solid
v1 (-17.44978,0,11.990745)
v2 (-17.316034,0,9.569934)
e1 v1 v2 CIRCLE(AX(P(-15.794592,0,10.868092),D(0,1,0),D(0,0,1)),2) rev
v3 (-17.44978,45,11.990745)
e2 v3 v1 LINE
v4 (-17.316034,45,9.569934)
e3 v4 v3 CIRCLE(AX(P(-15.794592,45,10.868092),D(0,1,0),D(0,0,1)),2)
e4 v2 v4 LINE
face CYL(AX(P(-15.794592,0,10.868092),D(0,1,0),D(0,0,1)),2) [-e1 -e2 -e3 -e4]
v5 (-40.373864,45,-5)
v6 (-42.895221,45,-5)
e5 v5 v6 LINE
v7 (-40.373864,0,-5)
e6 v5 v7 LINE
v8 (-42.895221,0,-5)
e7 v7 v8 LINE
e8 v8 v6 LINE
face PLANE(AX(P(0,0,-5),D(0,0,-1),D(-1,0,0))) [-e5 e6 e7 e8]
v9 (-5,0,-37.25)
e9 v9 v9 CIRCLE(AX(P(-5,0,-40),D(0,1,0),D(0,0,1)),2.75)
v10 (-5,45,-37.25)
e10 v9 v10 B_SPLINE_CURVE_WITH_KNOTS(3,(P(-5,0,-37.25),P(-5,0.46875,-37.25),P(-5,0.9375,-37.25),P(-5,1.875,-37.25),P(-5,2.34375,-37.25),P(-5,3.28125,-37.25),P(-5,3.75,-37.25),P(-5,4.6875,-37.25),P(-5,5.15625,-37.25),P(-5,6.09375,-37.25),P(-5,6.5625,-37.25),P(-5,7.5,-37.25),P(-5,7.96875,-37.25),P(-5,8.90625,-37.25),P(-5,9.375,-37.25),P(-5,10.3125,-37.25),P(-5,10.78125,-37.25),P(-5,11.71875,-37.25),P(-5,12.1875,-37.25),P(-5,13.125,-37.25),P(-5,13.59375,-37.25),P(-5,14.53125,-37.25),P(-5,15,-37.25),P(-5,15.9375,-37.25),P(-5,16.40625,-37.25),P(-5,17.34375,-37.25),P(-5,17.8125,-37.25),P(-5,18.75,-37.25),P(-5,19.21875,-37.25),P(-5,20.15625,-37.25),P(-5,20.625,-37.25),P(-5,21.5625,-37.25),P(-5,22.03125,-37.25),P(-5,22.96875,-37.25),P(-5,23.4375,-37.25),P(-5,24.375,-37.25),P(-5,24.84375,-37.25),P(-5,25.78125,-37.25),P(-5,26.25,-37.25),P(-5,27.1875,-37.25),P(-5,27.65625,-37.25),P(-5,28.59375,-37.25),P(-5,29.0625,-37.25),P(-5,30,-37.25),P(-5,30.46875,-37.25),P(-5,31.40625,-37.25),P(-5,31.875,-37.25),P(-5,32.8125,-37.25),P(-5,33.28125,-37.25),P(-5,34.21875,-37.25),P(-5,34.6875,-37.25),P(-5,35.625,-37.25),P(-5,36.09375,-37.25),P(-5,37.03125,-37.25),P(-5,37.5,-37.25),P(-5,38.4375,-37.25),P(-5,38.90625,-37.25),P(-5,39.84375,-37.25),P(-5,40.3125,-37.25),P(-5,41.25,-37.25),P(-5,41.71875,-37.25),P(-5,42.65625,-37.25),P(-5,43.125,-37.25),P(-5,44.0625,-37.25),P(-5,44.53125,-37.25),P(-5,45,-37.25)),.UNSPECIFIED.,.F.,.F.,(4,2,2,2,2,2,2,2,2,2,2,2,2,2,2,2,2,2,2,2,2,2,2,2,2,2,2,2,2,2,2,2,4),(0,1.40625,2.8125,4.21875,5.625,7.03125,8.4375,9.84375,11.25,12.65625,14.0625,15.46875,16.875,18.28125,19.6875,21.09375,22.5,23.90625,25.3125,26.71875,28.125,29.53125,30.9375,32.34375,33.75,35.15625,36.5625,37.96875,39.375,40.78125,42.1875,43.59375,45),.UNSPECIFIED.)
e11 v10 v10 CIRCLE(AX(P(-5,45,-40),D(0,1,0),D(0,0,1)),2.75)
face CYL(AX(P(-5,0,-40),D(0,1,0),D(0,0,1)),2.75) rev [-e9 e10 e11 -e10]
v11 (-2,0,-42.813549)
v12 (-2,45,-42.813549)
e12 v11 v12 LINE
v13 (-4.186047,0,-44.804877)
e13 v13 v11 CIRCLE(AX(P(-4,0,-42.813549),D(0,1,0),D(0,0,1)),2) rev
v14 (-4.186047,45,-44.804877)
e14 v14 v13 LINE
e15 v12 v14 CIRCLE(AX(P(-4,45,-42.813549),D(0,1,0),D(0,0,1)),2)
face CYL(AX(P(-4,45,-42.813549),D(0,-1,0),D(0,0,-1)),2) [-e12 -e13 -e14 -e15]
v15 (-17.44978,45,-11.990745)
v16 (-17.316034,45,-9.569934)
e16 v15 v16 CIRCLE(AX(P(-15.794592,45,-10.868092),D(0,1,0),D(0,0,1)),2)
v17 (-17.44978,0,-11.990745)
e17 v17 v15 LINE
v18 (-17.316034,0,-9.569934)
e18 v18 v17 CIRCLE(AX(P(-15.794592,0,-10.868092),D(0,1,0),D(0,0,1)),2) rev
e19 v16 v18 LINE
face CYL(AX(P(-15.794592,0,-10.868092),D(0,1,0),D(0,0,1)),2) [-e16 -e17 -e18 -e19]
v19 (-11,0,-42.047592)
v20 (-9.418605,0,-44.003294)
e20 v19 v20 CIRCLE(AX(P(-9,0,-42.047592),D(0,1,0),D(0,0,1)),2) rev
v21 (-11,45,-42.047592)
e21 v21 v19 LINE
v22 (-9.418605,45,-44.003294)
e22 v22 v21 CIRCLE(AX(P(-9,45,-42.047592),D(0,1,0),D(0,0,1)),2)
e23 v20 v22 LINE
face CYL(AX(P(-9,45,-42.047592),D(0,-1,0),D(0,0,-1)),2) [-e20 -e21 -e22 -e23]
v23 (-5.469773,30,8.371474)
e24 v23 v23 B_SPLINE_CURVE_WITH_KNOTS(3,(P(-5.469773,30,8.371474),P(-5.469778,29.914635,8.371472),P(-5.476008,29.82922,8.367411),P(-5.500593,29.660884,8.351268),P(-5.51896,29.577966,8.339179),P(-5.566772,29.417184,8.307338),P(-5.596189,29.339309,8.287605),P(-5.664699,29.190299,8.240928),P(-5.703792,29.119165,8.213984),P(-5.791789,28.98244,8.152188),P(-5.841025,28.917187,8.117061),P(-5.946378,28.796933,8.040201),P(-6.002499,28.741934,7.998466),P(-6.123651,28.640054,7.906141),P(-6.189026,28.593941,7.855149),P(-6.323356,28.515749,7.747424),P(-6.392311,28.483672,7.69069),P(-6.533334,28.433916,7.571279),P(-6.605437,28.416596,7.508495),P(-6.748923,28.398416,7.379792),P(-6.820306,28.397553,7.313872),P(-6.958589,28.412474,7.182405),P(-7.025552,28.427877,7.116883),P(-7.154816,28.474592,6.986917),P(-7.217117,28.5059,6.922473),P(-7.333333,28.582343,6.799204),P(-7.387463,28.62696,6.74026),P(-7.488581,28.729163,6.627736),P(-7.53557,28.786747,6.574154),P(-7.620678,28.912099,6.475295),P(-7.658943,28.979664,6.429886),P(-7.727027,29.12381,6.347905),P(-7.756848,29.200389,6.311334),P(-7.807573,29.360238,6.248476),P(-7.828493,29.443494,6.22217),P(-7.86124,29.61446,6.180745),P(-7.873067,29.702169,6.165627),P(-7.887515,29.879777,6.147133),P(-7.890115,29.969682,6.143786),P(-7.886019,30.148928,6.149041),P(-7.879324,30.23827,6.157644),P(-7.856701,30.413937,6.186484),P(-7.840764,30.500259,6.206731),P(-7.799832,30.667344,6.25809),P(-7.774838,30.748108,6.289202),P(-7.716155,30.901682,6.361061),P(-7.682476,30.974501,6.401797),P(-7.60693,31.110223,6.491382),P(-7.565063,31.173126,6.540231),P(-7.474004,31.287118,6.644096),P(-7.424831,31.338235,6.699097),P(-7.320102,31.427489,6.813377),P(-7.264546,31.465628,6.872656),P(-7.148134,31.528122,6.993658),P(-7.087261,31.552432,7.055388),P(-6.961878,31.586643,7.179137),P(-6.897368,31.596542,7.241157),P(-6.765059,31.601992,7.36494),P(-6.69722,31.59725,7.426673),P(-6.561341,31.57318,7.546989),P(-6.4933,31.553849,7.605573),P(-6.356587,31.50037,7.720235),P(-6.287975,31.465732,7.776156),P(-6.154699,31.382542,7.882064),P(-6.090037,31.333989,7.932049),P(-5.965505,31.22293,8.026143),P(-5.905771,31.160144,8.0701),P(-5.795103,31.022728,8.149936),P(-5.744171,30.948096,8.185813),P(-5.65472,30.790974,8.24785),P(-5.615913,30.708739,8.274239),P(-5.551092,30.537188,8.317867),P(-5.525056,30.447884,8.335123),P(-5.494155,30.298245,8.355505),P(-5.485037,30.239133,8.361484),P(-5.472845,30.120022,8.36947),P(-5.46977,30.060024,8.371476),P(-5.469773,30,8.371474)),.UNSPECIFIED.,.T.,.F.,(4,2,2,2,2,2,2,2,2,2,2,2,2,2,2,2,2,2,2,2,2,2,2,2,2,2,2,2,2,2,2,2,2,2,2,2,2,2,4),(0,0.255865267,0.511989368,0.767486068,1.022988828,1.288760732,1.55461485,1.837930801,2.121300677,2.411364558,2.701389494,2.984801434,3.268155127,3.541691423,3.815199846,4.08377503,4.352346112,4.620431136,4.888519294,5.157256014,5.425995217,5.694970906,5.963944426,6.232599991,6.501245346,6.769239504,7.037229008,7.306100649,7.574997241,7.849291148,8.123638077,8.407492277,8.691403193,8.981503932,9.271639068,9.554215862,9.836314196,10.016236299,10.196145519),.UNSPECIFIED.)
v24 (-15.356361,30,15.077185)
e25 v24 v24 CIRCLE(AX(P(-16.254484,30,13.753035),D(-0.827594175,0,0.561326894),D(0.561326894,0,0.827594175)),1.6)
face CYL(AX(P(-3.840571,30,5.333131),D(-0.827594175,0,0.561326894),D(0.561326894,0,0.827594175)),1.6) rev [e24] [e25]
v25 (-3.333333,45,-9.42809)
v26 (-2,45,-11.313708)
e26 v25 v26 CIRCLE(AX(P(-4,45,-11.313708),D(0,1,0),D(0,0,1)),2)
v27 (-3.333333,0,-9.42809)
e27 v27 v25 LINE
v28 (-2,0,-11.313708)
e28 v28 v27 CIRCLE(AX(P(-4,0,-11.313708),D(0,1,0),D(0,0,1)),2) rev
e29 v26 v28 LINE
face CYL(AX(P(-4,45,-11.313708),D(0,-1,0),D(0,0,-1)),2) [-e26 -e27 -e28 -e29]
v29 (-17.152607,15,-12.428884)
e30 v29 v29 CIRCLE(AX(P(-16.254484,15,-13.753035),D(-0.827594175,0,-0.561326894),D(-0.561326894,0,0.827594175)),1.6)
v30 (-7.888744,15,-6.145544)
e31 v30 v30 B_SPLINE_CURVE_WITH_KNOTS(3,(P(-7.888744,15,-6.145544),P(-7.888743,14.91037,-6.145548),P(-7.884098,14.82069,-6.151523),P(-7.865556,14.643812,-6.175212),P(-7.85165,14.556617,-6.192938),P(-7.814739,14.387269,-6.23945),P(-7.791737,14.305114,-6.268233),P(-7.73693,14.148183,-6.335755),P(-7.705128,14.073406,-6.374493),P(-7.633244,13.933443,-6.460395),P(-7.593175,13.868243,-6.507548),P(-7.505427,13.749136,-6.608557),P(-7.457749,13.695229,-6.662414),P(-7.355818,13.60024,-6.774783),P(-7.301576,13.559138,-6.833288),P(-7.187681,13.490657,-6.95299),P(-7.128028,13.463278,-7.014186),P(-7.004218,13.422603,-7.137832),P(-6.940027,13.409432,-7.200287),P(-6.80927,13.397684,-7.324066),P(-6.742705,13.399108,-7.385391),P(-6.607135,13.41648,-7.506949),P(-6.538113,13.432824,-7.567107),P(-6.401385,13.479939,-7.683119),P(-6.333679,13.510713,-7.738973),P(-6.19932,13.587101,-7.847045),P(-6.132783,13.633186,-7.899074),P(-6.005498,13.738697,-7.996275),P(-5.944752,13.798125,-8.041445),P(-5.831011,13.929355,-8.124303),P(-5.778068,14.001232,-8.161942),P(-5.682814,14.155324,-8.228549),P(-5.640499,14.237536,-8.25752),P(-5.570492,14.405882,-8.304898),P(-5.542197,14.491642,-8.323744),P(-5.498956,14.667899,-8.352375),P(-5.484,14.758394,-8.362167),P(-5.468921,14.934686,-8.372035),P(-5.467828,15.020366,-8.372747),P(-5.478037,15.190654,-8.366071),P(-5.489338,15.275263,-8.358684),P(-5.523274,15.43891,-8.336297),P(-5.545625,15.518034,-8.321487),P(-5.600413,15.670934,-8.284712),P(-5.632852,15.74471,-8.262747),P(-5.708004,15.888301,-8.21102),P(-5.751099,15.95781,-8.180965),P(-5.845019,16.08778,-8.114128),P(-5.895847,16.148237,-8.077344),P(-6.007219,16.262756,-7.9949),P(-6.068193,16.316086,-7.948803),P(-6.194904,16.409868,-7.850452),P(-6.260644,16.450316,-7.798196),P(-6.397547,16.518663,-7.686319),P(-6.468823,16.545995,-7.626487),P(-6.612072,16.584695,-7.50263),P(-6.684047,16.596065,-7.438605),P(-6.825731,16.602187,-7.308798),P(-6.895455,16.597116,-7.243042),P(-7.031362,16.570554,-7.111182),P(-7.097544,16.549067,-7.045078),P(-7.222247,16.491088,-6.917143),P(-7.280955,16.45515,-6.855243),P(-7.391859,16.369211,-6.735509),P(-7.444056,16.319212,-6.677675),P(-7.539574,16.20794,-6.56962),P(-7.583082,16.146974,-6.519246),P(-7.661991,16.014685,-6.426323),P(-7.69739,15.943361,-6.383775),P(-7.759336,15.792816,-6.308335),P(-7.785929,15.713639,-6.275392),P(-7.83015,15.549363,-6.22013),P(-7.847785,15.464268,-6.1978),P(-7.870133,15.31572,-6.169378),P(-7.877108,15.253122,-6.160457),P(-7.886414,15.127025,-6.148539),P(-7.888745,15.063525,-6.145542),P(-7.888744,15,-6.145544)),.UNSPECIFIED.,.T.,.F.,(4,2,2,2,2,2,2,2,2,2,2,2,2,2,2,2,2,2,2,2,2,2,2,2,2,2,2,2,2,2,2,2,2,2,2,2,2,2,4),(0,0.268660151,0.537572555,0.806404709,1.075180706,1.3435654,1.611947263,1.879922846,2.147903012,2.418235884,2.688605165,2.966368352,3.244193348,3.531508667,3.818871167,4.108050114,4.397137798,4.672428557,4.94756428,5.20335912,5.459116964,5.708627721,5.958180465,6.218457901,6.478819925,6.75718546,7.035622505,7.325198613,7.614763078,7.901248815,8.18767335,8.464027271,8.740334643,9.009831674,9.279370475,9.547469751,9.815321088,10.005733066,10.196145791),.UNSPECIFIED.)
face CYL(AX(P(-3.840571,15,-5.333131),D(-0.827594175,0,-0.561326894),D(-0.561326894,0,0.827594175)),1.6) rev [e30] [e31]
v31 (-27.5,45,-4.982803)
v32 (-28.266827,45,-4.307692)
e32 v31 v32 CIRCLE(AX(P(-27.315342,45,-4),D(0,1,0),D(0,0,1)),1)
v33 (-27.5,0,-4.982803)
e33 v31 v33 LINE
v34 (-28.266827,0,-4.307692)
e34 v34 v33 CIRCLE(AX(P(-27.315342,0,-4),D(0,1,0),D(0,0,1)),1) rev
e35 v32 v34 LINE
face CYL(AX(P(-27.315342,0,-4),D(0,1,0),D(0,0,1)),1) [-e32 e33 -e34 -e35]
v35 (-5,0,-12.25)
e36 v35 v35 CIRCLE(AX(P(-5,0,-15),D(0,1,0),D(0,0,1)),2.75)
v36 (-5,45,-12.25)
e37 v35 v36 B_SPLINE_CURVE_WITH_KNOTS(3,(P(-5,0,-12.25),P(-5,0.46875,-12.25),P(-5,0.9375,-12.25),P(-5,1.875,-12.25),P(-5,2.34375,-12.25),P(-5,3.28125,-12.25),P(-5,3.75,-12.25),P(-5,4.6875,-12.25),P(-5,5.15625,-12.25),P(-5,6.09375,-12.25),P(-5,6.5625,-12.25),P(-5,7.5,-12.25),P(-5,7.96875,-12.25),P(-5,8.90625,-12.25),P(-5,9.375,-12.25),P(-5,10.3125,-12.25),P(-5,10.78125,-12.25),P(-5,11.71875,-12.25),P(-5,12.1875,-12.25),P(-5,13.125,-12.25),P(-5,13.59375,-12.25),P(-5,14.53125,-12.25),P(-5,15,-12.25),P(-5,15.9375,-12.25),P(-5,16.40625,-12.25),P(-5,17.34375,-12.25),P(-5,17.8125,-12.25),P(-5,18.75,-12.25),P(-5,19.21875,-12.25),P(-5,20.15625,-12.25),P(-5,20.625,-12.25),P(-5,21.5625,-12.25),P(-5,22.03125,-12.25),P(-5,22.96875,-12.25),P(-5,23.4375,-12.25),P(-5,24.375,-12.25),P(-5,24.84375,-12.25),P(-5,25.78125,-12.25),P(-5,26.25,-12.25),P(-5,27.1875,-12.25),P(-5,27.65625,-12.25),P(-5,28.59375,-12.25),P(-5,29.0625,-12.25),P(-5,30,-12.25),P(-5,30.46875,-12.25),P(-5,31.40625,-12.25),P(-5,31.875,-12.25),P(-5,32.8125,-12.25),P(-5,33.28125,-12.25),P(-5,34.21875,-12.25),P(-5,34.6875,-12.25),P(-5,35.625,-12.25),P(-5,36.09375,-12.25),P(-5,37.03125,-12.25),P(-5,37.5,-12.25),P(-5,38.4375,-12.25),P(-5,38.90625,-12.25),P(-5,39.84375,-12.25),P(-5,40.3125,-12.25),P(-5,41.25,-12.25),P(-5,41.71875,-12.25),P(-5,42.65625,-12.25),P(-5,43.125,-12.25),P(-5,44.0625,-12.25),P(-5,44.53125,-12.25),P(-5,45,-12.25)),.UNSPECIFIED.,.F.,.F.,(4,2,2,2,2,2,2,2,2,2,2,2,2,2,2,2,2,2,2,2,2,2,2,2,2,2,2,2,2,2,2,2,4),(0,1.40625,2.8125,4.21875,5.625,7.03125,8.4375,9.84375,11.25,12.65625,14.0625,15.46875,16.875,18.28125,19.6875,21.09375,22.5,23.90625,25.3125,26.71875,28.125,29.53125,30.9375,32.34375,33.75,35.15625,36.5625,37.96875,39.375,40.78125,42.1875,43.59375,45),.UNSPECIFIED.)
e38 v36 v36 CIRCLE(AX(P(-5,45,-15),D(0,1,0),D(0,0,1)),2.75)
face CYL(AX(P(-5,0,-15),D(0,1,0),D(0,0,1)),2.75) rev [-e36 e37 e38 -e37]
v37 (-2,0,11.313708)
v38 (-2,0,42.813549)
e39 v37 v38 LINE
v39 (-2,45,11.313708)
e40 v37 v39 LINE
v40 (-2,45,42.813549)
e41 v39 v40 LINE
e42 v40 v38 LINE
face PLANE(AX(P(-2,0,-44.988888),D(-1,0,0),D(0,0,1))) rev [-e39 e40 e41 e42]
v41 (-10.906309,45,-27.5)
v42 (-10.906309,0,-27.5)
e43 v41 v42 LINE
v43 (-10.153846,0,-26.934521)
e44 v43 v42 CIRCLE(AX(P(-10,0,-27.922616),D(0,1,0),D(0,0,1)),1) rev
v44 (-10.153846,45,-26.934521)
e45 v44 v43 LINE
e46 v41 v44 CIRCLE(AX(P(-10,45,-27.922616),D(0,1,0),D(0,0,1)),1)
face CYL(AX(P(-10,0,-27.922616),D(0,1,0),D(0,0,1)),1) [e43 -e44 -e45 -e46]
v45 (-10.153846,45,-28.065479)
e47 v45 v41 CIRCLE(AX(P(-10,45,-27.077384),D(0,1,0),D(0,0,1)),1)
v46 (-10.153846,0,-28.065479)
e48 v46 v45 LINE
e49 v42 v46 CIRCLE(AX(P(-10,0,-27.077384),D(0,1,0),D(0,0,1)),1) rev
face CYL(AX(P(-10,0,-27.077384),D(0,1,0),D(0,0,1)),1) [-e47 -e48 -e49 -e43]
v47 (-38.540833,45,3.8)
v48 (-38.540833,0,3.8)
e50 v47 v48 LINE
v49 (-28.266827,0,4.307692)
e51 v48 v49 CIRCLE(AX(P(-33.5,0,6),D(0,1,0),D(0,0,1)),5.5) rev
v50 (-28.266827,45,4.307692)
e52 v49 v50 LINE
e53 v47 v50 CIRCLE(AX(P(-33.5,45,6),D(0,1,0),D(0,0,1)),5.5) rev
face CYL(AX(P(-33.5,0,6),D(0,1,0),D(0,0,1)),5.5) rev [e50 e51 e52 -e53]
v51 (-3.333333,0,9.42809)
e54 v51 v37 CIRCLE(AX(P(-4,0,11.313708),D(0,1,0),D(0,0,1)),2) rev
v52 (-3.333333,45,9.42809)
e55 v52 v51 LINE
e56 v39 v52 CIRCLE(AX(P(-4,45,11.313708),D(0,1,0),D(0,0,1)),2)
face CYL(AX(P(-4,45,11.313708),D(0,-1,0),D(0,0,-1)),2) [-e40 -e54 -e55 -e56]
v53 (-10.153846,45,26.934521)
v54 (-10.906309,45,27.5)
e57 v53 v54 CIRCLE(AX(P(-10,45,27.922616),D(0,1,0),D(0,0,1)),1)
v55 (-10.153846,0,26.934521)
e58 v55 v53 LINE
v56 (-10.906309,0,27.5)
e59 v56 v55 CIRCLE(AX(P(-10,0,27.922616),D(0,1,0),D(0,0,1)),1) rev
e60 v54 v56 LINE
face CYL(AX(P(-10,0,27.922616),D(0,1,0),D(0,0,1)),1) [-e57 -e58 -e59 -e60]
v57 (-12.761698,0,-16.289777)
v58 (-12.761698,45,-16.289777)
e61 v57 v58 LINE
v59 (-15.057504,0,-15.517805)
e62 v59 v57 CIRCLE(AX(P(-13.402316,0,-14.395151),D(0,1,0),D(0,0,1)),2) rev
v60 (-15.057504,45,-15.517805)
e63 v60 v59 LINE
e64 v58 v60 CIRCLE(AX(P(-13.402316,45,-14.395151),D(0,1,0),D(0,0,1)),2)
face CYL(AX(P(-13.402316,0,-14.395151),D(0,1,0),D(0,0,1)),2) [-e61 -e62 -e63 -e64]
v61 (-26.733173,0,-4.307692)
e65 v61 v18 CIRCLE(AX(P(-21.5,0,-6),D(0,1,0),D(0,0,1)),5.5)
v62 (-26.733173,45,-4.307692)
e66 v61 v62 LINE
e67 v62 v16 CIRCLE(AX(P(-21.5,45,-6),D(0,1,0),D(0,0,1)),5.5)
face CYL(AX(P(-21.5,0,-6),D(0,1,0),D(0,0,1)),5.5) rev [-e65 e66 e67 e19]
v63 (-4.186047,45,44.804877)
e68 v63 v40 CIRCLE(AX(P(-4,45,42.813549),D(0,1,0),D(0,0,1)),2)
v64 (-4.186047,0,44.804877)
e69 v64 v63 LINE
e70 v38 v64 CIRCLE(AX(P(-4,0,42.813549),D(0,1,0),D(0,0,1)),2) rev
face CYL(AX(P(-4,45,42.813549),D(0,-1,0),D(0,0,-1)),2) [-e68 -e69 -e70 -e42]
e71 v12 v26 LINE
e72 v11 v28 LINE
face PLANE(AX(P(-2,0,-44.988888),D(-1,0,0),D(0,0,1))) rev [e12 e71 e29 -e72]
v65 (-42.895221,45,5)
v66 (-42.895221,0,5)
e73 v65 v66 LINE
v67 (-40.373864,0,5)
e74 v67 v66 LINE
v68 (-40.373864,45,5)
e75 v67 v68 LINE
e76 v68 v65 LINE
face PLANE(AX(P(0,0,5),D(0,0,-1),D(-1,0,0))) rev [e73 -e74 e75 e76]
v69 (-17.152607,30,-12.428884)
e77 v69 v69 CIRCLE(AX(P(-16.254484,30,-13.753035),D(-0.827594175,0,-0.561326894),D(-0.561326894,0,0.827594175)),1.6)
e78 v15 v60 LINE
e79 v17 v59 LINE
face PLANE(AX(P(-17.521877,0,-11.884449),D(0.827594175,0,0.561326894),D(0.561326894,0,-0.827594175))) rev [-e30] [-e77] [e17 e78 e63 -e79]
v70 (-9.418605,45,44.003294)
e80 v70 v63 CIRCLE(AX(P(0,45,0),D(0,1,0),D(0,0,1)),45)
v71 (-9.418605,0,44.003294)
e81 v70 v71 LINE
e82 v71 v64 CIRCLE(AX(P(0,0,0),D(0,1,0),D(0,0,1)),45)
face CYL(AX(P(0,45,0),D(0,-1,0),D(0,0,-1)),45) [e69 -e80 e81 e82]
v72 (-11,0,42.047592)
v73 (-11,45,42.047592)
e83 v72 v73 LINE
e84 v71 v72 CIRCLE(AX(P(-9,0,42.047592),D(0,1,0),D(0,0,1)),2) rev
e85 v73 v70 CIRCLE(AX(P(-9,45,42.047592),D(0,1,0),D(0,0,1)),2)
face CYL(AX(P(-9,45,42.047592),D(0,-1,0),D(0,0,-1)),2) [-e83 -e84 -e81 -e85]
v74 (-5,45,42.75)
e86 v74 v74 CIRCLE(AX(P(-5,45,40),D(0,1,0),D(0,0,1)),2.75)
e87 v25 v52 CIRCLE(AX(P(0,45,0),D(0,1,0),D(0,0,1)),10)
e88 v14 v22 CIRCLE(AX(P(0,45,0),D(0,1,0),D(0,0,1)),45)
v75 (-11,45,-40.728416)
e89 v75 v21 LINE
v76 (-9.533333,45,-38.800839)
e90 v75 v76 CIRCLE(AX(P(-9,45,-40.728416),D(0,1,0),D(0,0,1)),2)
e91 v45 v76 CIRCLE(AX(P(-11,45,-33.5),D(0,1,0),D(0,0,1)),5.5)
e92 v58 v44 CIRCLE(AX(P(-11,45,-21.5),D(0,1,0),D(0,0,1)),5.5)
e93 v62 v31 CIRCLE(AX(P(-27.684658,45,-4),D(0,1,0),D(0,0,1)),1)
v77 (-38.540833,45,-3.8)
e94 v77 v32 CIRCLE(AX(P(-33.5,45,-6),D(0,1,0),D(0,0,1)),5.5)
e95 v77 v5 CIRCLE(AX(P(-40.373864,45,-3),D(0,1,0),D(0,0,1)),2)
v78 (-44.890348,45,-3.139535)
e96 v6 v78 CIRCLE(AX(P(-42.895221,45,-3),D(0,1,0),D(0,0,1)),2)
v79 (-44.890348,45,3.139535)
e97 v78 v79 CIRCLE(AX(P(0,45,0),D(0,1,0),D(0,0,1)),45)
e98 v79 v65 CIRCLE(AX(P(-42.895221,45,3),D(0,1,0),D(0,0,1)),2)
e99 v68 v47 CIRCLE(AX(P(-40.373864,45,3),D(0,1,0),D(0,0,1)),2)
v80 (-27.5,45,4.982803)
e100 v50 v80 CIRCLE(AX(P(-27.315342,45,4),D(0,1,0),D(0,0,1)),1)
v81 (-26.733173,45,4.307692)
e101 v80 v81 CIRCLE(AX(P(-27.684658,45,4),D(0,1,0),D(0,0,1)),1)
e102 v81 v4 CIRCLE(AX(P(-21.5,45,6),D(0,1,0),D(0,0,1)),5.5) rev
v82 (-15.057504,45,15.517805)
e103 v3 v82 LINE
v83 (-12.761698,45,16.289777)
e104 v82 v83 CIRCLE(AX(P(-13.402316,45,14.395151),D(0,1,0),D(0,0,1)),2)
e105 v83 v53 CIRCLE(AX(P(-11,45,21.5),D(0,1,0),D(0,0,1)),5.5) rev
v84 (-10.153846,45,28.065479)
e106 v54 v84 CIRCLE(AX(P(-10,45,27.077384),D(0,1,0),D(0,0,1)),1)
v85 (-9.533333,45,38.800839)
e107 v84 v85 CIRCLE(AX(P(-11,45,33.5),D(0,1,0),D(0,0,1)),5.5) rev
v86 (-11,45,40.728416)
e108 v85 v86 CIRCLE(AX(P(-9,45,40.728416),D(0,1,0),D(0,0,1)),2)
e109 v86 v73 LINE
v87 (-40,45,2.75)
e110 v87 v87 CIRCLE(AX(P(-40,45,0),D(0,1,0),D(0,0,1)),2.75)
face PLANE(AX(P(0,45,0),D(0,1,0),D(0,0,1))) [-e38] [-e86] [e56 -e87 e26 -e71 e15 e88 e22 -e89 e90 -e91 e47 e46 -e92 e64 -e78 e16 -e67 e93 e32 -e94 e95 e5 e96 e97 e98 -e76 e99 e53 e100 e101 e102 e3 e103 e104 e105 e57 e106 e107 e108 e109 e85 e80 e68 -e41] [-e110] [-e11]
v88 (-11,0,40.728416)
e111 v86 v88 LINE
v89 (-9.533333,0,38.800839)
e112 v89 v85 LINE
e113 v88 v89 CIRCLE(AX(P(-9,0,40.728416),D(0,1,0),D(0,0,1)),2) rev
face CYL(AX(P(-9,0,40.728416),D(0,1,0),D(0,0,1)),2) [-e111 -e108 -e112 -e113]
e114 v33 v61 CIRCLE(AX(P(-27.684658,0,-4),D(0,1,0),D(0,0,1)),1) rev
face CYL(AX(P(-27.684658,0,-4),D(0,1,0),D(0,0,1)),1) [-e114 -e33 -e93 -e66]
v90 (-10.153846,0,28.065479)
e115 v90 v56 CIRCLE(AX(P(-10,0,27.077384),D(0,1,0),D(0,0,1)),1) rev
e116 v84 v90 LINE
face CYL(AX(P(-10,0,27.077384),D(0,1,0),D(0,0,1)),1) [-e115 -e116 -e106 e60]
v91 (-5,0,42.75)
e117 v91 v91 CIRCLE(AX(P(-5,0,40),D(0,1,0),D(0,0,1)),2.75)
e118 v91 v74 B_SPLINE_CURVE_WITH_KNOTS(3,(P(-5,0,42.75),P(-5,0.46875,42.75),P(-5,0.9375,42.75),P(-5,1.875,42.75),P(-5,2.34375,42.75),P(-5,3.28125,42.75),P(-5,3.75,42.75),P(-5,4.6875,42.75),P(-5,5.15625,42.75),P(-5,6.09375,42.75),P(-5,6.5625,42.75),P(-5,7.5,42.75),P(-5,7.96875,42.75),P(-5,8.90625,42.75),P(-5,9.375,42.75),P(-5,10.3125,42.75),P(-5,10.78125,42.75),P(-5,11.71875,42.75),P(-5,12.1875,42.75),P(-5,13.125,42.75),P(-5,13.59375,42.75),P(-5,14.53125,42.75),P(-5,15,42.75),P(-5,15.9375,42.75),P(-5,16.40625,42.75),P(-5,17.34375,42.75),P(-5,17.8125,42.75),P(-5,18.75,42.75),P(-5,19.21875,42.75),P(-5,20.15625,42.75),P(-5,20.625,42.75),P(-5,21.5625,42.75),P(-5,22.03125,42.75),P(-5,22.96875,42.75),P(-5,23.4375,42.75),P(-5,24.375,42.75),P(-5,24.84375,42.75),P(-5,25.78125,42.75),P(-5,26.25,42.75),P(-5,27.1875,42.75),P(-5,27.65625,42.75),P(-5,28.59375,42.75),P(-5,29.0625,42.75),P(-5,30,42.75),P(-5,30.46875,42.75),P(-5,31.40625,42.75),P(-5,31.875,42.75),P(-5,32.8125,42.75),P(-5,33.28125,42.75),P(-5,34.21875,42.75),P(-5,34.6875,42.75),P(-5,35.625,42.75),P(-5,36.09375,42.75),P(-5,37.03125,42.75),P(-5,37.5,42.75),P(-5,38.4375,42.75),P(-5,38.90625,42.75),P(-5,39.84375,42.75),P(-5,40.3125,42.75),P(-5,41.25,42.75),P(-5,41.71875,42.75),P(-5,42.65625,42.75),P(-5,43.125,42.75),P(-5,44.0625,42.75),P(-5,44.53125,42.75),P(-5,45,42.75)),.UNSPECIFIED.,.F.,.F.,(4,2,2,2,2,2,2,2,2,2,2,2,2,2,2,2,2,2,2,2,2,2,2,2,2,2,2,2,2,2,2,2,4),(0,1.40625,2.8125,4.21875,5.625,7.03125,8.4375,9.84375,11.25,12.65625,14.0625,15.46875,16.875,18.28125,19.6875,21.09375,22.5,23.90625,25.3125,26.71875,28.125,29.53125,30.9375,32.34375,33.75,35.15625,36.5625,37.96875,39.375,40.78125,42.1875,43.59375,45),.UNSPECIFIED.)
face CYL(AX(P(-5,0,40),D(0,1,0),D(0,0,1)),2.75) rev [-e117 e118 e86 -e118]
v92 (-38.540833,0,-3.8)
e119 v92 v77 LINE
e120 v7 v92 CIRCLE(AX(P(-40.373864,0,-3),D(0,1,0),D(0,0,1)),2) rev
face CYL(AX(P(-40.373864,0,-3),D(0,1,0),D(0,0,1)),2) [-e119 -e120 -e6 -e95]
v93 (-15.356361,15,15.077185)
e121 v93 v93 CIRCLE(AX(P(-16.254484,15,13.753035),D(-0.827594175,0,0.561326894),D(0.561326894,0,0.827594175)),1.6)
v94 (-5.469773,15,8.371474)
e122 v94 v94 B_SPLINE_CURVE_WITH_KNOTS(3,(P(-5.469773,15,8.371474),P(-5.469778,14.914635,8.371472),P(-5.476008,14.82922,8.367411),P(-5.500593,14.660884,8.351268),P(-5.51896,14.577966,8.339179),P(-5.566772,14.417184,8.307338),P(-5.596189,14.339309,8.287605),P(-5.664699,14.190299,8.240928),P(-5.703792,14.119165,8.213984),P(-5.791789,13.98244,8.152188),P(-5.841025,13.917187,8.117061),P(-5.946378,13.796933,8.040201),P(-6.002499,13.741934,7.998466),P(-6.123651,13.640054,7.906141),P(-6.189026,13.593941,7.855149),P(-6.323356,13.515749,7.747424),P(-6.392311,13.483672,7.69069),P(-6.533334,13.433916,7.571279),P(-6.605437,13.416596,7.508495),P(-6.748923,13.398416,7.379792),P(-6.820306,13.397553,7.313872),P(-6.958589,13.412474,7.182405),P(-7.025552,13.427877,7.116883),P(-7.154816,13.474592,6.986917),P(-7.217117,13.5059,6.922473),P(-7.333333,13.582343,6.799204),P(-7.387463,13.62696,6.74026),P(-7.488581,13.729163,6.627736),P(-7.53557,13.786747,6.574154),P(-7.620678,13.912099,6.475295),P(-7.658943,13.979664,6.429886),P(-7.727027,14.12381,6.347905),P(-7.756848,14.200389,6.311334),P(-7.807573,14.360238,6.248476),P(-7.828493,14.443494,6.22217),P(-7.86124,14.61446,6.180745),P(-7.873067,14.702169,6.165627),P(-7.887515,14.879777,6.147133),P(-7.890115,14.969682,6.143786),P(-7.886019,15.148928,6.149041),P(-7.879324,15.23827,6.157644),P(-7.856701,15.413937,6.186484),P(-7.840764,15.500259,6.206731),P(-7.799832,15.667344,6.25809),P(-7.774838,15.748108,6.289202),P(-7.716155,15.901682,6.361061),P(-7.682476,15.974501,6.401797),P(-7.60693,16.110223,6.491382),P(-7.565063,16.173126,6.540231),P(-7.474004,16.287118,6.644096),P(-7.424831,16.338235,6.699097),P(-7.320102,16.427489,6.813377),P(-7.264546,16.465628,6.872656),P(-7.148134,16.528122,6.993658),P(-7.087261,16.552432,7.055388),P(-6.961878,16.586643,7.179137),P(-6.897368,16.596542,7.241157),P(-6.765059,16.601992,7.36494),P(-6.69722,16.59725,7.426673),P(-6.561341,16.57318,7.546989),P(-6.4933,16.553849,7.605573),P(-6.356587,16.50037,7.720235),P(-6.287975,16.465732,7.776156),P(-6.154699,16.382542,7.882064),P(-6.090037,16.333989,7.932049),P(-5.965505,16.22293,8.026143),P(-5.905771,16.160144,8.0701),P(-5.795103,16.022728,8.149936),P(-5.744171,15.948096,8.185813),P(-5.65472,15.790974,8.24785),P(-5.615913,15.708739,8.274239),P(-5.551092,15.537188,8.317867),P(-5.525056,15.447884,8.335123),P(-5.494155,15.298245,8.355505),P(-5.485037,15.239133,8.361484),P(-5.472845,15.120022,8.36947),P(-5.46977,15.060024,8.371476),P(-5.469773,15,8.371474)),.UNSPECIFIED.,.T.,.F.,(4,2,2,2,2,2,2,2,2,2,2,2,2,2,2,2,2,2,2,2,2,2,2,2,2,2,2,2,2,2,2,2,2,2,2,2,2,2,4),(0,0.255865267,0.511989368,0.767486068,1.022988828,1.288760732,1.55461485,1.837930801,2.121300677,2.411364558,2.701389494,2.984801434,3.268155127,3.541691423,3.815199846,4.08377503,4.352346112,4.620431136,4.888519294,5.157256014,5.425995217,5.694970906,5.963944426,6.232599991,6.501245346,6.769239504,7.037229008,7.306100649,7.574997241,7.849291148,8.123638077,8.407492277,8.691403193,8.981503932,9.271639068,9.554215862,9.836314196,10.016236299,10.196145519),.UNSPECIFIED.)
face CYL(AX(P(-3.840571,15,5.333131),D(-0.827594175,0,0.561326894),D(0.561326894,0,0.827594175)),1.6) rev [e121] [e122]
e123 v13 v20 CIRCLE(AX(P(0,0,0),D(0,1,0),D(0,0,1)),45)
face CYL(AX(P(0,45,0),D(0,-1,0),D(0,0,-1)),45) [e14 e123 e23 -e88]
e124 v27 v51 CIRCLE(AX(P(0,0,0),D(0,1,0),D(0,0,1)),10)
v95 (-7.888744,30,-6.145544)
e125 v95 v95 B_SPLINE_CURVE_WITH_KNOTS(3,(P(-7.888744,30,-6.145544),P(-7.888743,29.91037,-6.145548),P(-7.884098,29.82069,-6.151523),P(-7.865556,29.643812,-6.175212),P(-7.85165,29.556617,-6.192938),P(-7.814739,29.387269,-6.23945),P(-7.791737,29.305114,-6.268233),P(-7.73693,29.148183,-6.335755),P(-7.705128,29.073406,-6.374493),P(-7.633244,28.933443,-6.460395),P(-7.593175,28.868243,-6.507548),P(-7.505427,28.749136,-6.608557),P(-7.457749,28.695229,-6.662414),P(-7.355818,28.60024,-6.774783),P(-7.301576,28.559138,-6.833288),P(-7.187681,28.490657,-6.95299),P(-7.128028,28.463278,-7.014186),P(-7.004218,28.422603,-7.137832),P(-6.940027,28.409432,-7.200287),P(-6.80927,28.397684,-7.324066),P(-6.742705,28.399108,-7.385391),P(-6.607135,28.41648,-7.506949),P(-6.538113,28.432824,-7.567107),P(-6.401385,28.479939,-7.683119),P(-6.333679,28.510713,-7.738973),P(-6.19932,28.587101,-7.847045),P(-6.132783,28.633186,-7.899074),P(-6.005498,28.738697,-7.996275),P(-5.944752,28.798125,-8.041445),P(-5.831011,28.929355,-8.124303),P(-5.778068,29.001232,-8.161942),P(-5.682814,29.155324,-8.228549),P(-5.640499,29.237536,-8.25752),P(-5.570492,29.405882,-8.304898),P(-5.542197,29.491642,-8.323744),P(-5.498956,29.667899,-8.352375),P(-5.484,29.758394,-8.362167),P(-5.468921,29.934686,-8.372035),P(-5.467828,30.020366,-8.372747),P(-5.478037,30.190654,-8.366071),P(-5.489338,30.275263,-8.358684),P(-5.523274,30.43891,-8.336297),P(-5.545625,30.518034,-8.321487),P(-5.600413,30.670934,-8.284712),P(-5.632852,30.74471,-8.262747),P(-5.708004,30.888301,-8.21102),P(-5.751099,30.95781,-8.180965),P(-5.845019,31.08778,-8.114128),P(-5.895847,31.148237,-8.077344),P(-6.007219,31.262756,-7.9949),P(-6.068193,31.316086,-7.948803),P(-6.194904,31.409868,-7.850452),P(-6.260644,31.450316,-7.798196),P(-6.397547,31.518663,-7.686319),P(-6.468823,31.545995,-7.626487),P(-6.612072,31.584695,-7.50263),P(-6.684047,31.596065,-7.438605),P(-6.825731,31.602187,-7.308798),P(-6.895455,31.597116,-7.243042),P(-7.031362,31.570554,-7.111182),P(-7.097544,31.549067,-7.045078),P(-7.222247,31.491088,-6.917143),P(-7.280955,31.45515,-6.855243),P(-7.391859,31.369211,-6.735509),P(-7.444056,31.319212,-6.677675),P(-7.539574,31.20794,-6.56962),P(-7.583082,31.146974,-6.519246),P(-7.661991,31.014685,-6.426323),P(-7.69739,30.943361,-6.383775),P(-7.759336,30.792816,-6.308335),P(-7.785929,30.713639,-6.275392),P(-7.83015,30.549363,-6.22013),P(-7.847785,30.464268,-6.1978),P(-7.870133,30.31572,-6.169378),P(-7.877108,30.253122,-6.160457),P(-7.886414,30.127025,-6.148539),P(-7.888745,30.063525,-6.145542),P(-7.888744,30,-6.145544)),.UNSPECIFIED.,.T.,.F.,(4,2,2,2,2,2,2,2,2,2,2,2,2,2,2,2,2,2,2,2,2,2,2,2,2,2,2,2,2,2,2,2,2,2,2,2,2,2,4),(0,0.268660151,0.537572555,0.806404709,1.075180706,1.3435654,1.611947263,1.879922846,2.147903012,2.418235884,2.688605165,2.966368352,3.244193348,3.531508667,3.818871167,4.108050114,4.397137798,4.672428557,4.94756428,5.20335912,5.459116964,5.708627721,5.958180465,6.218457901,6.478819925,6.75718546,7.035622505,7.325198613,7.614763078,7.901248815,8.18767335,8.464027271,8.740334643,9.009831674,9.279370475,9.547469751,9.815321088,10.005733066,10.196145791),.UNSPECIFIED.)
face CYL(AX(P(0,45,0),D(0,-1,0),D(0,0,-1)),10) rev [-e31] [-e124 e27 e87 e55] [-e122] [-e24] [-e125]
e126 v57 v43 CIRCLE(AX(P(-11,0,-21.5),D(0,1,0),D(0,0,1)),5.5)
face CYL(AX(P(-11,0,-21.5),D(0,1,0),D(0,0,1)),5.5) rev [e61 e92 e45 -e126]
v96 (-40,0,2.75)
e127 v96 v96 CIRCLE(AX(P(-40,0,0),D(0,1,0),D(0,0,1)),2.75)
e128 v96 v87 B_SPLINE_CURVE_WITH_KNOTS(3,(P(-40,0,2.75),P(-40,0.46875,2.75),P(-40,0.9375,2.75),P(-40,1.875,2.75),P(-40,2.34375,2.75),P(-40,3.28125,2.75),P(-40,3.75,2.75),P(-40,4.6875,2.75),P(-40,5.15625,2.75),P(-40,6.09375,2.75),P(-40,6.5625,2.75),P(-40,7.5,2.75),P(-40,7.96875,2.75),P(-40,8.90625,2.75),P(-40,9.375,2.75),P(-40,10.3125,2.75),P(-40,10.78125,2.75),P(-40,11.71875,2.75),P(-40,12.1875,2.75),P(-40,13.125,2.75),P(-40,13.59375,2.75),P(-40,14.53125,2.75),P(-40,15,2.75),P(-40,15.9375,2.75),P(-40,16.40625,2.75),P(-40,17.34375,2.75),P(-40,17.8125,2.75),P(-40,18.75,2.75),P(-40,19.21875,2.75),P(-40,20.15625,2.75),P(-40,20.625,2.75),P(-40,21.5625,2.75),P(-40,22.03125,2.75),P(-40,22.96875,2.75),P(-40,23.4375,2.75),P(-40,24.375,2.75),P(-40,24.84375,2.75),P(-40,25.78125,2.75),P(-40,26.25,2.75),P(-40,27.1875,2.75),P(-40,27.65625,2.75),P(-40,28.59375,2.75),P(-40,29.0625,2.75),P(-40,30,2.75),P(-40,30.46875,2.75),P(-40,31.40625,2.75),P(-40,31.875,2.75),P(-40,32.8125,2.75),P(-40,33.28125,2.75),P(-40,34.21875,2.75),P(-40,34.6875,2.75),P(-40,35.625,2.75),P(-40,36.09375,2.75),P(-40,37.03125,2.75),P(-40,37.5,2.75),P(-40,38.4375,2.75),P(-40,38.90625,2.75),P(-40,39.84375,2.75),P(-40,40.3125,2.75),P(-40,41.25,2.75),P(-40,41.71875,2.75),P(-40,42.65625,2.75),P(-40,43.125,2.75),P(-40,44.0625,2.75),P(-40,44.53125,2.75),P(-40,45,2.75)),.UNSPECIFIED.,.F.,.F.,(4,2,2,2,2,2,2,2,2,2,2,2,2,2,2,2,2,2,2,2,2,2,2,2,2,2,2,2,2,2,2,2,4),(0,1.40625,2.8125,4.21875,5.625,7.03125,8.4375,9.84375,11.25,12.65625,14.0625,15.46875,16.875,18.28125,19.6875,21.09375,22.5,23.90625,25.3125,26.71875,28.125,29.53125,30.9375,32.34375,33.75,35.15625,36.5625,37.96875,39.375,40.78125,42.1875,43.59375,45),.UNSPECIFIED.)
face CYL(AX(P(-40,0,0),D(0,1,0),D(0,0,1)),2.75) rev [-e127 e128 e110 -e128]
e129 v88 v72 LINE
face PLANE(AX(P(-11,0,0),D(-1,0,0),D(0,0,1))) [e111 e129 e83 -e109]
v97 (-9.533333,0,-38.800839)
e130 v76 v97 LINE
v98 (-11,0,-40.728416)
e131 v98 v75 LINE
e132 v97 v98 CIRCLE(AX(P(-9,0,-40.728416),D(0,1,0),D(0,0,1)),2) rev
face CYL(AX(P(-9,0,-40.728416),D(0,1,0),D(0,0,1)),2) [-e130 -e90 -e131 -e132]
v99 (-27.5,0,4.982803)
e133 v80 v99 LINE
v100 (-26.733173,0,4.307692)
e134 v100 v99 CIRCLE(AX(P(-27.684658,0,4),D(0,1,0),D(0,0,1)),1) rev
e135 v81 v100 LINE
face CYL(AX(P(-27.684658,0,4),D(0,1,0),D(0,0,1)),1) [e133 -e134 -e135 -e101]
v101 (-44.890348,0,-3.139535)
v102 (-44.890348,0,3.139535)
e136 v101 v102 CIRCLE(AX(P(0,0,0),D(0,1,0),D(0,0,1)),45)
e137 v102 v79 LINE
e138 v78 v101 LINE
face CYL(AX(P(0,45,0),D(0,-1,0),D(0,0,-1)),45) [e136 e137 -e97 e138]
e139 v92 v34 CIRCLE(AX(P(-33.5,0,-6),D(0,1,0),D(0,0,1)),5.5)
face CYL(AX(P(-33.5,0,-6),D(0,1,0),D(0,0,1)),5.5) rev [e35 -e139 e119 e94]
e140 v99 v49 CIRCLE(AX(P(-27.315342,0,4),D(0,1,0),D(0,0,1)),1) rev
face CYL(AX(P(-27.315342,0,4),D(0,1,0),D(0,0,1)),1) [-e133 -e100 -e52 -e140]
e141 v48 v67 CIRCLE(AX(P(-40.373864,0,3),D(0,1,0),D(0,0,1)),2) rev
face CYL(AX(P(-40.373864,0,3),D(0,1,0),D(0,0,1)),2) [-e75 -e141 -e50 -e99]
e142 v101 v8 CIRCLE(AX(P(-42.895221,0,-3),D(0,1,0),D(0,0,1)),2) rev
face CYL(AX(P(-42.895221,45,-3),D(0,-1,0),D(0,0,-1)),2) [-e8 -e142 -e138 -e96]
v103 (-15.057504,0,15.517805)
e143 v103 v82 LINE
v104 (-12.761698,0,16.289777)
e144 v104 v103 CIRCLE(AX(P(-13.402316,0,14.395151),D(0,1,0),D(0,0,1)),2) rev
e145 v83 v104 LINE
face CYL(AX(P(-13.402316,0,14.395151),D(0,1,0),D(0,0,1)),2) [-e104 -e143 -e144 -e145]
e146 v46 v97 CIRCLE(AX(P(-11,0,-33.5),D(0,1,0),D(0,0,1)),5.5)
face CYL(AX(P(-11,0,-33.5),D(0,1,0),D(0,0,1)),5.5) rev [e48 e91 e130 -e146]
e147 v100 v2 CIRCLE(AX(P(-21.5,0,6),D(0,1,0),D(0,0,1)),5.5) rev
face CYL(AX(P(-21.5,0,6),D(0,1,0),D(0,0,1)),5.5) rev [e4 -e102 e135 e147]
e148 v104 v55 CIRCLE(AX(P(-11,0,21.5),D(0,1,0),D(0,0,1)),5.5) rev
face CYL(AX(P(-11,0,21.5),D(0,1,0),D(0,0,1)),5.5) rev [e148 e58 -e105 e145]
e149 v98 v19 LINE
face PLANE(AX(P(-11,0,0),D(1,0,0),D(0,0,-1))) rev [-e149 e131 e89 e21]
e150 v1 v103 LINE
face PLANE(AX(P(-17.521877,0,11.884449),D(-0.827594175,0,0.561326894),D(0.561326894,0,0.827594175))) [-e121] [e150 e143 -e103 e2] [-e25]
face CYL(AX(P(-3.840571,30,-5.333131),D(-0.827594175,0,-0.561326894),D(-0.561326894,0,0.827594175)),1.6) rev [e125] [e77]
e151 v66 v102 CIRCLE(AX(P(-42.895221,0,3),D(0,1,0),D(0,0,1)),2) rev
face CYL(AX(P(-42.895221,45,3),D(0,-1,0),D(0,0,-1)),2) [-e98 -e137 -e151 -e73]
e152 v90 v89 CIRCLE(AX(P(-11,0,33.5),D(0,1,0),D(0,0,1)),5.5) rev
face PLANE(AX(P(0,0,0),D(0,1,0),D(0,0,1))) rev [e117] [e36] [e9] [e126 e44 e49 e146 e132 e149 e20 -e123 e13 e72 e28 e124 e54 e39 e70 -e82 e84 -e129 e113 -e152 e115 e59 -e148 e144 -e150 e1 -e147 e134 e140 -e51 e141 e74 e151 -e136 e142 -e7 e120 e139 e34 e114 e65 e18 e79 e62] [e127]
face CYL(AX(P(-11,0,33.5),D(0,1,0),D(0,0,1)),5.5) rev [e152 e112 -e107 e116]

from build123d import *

# Parameters (mm, degrees)
BOSS_EXTRUDE1_DEPTH = 45
SKETCH2_R           = 2.75
CUT_EXTRUDE1_DEPTH  = 45
SKETCH3_R           = 5.5
CUT_EXTRUDE2_DEPTH  = 45
CUT_EXTRUDE3_DEPTH  = 45
SKETCH5_R           = 1.6
CUT_EXTRUDE5_DEPTH  = 15
SKETCH6_R           = 1.6
CUT_EXTRUDE6_DEPTH  = 15
FILLET1_R           = 2
FILLET2_R           = 1
FILLET3_R           = 2
FILLET4_R           = 1
SKETCH7_W           = 1
SKETCH7_H           = 92.409175645
CUT_EXTRUDE7_DEPTH  = 45
FILLET8_R           = 2


with BuildPart() as part:
    # Sketch1 → Boss-Extrude1 (new body)
    with BuildSketch(Plane(origin=(0, 0, 0), x_dir=(1, 0, 0), z_dir=(0, 1, 0))):
        with BuildLine():
            Line((-1, 9.949874371), (-1, 44.988887517))
            ThreePointArc((-1, 44.988887517), (-45, 0), (-1, -44.988887517))
            Line((-1, -44.988887517), (-1, -9.949874371))
            ThreePointArc((-1, -9.949874371), (-10, 0), (-1, 9.949874371))
        make_face()
    extrude(amount=BOSS_EXTRUDE1_DEPTH)

    # Sketch2 → Cut-Extrude1 (cut)
    with BuildSketch(Plane(origin=(0, 45, 0), x_dir=(1, 0, 0), z_dir=(0, 1, 0))):
        with Locations(Location((-40, 0, 0), (0, 0, 270))):
            Circle(SKETCH2_R)
        with Locations(Location((-5, 15, 0), (0, 0, 270))):
            Circle(SKETCH2_R)
        with Locations(Location((-5, 40, 0), (0, 0, 270))):
            Circle(SKETCH2_R)
        with Locations(Location((-5, -40, 0), (0, 0, 270))):
            Circle(SKETCH2_R)
    extrude(amount=-CUT_EXTRUDE1_DEPTH, mode=Mode.SUBTRACT)

    # Sketch3 → Cut-Extrude2 (cut)
    with BuildSketch(Plane(origin=(0, 45, 0), x_dir=(1, 0, 0), z_dir=(0, 1, 0))):
        with Locations(Location((-33.5, 6, 0), (0, 0, 270))):
            Circle(SKETCH3_R)
        with Locations(Location((-21.5, 6, 0), (0, 0, 270))):
            Circle(SKETCH3_R)
        with Locations(Location((-11, 21.5, 0), (0, 0, 270))):
            Circle(SKETCH3_R)
        with Locations(Location((-11, 33.5, 0), (0, 0, 270))):
            Circle(SKETCH3_R)
        with Locations(Location((-33.5, -6, 0), (0, 0, 270))):
            Circle(SKETCH3_R)
        with Locations(Location((-21.5, -6, 0), (0, 0, 270))):
            Circle(SKETCH3_R)
        with Locations(Location((-11, -33.5, 0), (0, 0, 270))):
            Circle(SKETCH3_R)
        with Locations(Location((-11, -21.5, 0), (0, 0, 270))):
            Circle(SKETCH3_R)
    extrude(amount=-CUT_EXTRUDE2_DEPTH, mode=Mode.SUBTRACT)

    # Sketch4 → Cut-Extrude3 (cut)
    with BuildSketch(Plane(origin=(0, 45, 0), x_dir=(1, 0, 0), z_dir=(0, 1, 0))):
        with BuildLine():
            ThreePointArc((-11, 43.634848459), (-33.902512538, 29.590870951), (-44.72135955, 5))
            Line((-44.72135955, 5), (-38.908326913, 5))
            ThreePointArc((-38.908326913, 5), (-34.002096593, 11.477033779), (-28, 6))
            ThreePointArc((-28, 6), (-28.022966221, 5.497903407), (-28.091673087, 5))
            Line((-28.091673087, 5), (-27.5, 5))
            Line((-27.5, 5), (-26.908326913, 5))
            ThreePointArc((-26.908326913, 5), (-24.51323898, 10.601129302), (-18.421669276, 10.557837201))
            Line((-18.421669276, 10.557837201), (-14.087297918, 16.948232039))
            ThreePointArc((-14.087297918, 16.948232039), (-16.257600393, 23.11481829), (-11, 27))
            Line((-11, 27), (-11, 28))
            ThreePointArc((-11, 28), (-16.5, 33.5), (-11, 39))
            Line((-11, 39), (-11, 43.634848459))
        make_face()
        with BuildLine():
            Line((-38.908326913, -5), (-44.72135955, -5))
            ThreePointArc((-44.72135955, -5), (-33.902512538, -29.590870951), (-11, -43.634848459))
            Line((-11, -43.634848459), (-11, -39))
            ThreePointArc((-11, -39), (-16.5, -33.5), (-11, -28))
            Line((-11, -28), (-11, -27))
            ThreePointArc((-11, -27), (-16.257600393, -23.11481829), (-14.087297918, -16.948232039))
            Line((-14.087297918, -16.948232039), (-18.421669276, -10.557837201))
            ThreePointArc((-18.421669276, -10.557837201), (-24.51323898, -10.601129302), (-26.908326913, -5))
            Line((-26.908326913, -5), (-27.5, -5))
            Line((-27.5, -5), (-28.091673087, -5))
            ThreePointArc((-28.091673087, -5), (-28.022966221, -5.497903407), (-28, -6))
            ThreePointArc((-28, -6), (-34.002096593, -11.477033779), (-38.908326913, -5))
        make_face()
    extrude(amount=-CUT_EXTRUDE3_DEPTH, mode=Mode.SUBTRACT)

    # Sketch5 → Cut-Extrude5 (cut)
    with BuildSketch(Plane(origin=(-17.521876952, 0, -11.884449008), x_dir=(-0.5613268941159263, 0, 0.8275941746666465), z_dir=(-0.8275941746666464, 0, -0.5613268941159262))):
        with Locations((-2.257852543, 30)):
            Circle(SKETCH5_R)
        with Locations((-2.257852543, 15)):
            Circle(SKETCH5_R)
    extrude(amount=-CUT_EXTRUDE5_DEPTH, mode=Mode.SUBTRACT)

    # Sketch6 → Cut-Extrude6 (cut)
    with BuildSketch(Plane(origin=(-17.521876952, 0, 11.884449008), x_dir=(0.5613268941159263, 0, 0.8275941746666465), z_dir=(-0.8275941746666464, 0, 0.5613268941159262))):
        with Locations((2.257852543, 30)):
            Circle(SKETCH6_R)
        with Locations((2.257852543, 15)):
            Circle(SKETCH6_R)
    extrude(amount=-CUT_EXTRUDE6_DEPTH, mode=Mode.SUBTRACT)

    # Fillet1
    fillet1_edges = [part.edges().sort_by_distance(p)[0] for p in [
        (-18.421669276, 22.5, 10.557837201),
        (-14.087297918, 22.5, 16.948232039),
        (-14.087297918, 22.5, -16.948232039),
        (-18.421669276, 22.5, -10.557837201),
    ]]
    fillet(fillet1_edges, radius=FILLET1_R)

    # Fillet2
    # the kernel refuses this fillet: 1 mm, written as the material it takes off along each edge
    with BuildSketch(Plane(origin=(-11, 47.306540723, 28), x_dir=(0.9970192610334746, 0, 0.0771530500256742), z_dir=(0, -1, 0)), Plane(origin=(-11, 47.306540723, -27), x_dir=(0.9970192610334746, 0, 0.0771530500256742), z_dir=(0, -1, 0))) as fillet2_piece_1:
        with BuildLine():
            CenterArc((0.9258366, -0.997019261), FILLET2_R, 94.424941549, 81.150116902)
            Line((-0.071182661, -0.919866211), (0, 0))
            ThreePointArc((0, 0), (0.424341775, -0.016394064), (0.84868355, 0))
        make_face()
    extrude(amount=49.613081447, mode=Mode.SUBTRACT)
    with BuildSketch(Plane(origin=(-11, 47.306540723, 27), x_dir=(0, 0, 1), z_dir=(0, -1, 0)), Plane(origin=(-11, 47.306540723, -28), x_dir=(0, 0, 1), z_dir=(0, -1, 0))) as fillet2_piece_2:
        with BuildLine():
            CenterArc((0.922616289, -1), FILLET2_R, 90, 81.150116902)
            ThreePointArc((-0.065478524, -0.846153846), (-0.016394064, -0.424341775), (0, 0))
            Line((0, 0), (0.922616289, 0))
        make_face()
    extrude(amount=49.613081447, mode=Mode.SUBTRACT)

    # Fillet3
    fillet3_edges = [part.edges().sort_by_distance(p)[0] for p in [
        (-11, 22.5, 39),
        (-11, 22.5, 43.634848459),
        (-44.72135955, 22.5, 5),
        (-38.908326913, 22.5, 5),
        (-38.908326913, 22.5, -5),
        (-44.72135955, 22.5, -5),
        (-11, 22.5, -43.634848459),
        (-11, 22.5, -39),
    ]]
    fillet(fillet3_edges, radius=FILLET3_R)

    # Fillet4
    # the kernel refuses this fillet: 1 mm, written as the material it takes off along each edge
    with BuildSketch(Plane(origin=(-26.908326913, 46.940828813, 5), x_dir=(-1, 0, 0), z_dir=(0, -1, 0)), Plane(origin=(-28.091673087, 46.940828813, -5), x_dir=(1, 0, 0), z_dir=(0, -1, 0))) as fillet4_piece_1:
        with BuildLine():
            CenterArc((0.776331525, 1), FILLET4_R, 197.920213139, 72.079786861)
            ThreePointArc((-0.175154388, 0.692307692), (-0.076329158, 0.348999608), (0, 0))
            Line((0, 0), (0.776331525, 0))
        make_face()
    extrude(amount=48.881657626, mode=Mode.SUBTRACT)
    with BuildSketch(Plane(origin=(-28.091673087, 46.940828813, 5), x_dir=(-0.24527265600487286, 0, -0.9694541372423533), z_dir=(0, -1, 0)), Plane(origin=(-26.908326913, 46.940828813, -5), x_dir=(0.2452726560048734, 0, 0.9694541372423531), z_dir=(0, -1, 0))) as fillet4_piece_2:
        with BuildLine():
            CenterArc((0.779041242, 0.997890465), FILLET4_R, 194.197947418, 72.079786861)
            Line((-0.190412895, 0.752617809), (0, 0))
            ThreePointArc((0, 0), (0.357060569, 0.011602442), (0.714121139, 0))
        make_face()
    extrude(amount=48.881657626, mode=Mode.SUBTRACT)

    # Sketch7 → Cut-Extrude7 (cut)
    with BuildSketch(Plane(origin=(0, 45, 0), x_dir=(1, 0, 0), z_dir=(0, 1, 0))):
        with Locations((-1.5, -1.215700306)):
            Rectangle(SKETCH7_W, SKETCH7_H)
    extrude(amount=-CUT_EXTRUDE7_DEPTH, mode=Mode.SUBTRACT)

    # Fillet8
    fillet8_edges = [part.edges().sort_by_distance(p)[0] for p in [
        (-2, 22.5, -44.955533586),
        (-2, 22.5, 44.955533586),
        (-2, 22.5, -9.797958971),
        (-2, 22.5, 9.797958971),
    ]]
    fillet(fillet8_edges, radius=FILLET8_R)


solid = part.part
